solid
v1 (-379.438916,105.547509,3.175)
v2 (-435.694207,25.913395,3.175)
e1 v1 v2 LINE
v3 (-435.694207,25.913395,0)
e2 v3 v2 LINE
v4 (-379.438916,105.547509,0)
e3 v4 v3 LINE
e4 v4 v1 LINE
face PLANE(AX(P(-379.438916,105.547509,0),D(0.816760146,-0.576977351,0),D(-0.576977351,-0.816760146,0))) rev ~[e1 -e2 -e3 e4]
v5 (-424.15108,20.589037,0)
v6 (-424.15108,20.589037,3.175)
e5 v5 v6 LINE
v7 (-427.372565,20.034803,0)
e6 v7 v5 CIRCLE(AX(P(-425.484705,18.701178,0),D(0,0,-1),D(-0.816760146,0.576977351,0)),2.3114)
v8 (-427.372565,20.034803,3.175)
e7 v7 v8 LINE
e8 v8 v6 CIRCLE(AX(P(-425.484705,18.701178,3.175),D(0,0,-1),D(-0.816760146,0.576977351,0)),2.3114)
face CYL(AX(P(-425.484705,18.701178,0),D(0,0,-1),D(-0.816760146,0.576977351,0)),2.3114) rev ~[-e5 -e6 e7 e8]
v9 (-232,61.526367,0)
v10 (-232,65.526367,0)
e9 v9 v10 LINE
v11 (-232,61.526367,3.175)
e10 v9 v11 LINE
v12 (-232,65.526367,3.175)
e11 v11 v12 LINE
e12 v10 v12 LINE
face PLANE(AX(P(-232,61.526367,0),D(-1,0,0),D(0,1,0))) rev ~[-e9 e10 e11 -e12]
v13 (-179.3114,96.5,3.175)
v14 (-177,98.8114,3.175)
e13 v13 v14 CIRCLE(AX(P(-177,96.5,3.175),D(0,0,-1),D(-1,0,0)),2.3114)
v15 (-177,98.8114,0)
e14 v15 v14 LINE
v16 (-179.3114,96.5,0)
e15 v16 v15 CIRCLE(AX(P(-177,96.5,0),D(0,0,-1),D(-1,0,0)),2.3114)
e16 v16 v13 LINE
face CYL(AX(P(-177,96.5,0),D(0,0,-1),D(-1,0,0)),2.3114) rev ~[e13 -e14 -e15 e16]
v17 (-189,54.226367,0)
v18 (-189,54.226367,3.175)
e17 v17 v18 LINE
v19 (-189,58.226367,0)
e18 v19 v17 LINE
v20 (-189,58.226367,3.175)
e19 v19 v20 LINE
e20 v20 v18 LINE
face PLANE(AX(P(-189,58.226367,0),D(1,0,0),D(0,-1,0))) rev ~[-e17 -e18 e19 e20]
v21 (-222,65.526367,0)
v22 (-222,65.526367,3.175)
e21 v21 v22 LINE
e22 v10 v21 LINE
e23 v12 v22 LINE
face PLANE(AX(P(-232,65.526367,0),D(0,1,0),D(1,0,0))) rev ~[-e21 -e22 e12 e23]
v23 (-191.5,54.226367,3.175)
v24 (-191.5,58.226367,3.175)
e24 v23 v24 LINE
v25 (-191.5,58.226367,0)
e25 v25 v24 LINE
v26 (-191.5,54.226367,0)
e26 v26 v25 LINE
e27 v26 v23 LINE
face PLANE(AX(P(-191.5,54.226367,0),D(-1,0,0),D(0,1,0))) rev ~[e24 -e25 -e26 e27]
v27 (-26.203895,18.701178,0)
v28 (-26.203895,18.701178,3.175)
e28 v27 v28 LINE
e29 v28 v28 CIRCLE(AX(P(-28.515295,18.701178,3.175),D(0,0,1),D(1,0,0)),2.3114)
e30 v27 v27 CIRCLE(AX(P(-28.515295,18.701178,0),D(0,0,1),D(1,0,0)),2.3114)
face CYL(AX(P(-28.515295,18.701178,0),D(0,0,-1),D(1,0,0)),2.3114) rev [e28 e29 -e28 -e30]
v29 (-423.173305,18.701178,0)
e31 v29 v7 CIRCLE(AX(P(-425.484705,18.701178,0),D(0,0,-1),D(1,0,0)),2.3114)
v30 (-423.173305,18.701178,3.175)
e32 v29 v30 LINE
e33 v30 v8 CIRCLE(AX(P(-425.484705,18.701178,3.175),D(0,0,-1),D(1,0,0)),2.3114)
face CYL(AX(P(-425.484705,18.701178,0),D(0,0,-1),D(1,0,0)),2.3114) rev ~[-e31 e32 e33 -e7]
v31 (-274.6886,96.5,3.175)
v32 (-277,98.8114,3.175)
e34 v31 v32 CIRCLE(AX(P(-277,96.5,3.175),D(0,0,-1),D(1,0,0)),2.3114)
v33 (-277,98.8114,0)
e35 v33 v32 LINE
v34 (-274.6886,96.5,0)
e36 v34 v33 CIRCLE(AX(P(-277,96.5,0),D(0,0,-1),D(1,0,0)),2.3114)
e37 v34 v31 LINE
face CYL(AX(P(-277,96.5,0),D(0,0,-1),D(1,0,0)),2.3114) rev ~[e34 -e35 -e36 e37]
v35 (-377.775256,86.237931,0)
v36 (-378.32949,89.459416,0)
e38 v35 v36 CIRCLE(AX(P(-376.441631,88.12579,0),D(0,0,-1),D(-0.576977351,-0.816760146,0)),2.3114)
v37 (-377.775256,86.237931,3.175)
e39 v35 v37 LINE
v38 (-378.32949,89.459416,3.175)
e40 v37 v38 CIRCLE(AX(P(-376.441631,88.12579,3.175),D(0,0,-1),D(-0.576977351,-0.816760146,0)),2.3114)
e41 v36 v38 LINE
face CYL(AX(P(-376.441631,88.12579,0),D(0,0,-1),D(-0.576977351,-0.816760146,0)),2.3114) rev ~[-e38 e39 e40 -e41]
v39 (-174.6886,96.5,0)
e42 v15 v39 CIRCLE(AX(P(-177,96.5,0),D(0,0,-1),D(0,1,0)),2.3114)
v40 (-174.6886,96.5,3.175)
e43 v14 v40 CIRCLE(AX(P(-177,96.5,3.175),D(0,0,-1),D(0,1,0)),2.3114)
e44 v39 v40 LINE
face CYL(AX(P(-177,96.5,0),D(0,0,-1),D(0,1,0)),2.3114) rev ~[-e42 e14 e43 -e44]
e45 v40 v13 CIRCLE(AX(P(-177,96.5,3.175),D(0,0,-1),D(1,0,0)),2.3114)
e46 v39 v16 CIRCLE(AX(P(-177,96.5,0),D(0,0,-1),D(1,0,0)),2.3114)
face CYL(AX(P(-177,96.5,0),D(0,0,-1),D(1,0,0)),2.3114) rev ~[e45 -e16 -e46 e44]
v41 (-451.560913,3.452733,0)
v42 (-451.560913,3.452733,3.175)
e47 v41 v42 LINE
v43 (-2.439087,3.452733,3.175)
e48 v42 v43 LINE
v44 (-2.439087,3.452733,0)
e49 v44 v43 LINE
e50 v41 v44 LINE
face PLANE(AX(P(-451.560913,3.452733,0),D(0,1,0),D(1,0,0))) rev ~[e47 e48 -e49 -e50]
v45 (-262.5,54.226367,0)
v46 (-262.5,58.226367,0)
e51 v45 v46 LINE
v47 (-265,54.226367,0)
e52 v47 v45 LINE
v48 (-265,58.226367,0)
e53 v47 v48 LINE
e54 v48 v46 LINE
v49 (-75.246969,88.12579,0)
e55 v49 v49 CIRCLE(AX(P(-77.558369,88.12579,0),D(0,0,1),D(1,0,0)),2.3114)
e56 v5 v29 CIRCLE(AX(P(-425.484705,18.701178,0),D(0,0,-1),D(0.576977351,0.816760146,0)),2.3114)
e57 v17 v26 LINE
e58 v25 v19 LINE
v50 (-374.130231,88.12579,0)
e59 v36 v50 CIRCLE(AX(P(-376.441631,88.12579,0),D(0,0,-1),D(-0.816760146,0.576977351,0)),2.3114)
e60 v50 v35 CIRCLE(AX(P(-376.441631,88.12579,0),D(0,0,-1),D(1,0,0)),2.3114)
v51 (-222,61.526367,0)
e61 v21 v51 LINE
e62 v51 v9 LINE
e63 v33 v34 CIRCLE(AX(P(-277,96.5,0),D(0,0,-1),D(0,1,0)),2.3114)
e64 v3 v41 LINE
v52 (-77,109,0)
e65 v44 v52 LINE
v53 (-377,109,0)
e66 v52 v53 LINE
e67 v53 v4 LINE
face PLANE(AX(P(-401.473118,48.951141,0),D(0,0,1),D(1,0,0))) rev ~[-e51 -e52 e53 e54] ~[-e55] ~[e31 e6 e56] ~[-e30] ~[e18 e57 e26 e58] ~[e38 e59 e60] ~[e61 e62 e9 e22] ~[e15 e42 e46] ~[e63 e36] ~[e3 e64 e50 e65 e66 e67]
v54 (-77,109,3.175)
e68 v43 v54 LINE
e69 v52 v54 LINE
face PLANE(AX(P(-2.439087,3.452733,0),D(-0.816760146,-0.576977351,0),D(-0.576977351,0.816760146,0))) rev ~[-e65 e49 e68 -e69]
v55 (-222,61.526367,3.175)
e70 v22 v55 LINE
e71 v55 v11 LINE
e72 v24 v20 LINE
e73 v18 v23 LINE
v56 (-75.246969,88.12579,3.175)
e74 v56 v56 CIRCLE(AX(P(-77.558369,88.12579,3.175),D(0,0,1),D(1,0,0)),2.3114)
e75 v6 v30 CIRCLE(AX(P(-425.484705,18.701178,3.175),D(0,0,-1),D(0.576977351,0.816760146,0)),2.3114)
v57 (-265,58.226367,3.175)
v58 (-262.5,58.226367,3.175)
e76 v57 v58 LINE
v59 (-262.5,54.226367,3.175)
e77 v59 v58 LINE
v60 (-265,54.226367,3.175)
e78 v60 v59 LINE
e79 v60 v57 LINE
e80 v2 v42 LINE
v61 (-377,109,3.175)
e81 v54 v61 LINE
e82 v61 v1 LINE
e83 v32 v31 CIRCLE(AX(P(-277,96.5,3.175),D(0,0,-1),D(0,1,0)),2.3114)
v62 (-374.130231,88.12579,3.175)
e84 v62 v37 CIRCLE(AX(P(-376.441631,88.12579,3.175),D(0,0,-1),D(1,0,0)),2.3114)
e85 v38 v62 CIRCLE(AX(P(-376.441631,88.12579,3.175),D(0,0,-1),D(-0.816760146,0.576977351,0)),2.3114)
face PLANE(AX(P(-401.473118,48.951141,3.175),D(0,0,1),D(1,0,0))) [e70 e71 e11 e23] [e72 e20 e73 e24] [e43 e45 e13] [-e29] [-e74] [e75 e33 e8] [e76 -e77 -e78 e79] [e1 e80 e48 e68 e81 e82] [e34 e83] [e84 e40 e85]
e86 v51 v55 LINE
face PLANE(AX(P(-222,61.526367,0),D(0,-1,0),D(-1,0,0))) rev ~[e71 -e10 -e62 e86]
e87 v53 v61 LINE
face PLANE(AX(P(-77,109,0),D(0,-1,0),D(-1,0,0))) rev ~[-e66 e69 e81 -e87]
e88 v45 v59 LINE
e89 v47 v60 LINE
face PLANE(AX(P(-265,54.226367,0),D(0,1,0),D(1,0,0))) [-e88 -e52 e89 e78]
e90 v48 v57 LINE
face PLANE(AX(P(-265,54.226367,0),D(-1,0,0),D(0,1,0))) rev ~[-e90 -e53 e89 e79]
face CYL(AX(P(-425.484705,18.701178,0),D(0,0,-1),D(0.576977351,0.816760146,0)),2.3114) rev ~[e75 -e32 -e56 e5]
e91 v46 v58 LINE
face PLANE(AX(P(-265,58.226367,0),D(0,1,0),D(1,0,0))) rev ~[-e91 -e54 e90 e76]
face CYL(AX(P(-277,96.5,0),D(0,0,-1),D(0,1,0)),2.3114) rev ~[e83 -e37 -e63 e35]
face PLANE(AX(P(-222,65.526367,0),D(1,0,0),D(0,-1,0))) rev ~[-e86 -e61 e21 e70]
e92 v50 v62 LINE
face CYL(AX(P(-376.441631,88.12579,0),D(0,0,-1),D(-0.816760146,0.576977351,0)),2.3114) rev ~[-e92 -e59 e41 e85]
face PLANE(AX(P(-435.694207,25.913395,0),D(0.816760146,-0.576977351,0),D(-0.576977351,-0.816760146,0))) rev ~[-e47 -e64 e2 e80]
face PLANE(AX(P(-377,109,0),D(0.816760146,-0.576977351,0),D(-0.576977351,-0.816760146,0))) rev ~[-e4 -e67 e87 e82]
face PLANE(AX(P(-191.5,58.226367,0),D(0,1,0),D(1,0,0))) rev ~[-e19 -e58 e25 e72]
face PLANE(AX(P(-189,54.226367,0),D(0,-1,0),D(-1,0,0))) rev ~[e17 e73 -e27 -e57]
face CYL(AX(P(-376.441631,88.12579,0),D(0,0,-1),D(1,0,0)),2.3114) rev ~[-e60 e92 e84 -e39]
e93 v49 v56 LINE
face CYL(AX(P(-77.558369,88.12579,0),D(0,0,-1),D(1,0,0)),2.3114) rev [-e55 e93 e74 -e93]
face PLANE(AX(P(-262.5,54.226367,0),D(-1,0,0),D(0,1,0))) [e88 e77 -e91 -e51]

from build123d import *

# Parameters (mm, degrees)
F0_W     = 2.5
F0_H     = 4
F0_R     = 2.3114
F1_DEPTH = 3.175


with BuildPart() as f1:
    # F0 (on Top) → F1 (new body)
    with BuildSketch(Plane.XY):
        with BuildLine():
            Line((-451.5609132883, 3.4527331373), (-420.9521720122, 3.4527331373))
            Line((-420.9521720122, 3.4527331373), (-359.0199119076, 91.1230753634))
            Line((-359.0199119076, 91.1230753634), (-379.4389155629, 105.5475091382))
            Line((-379.4389155629, 105.5475091382), (-386.6511324503, 95.3380073106))
            Line((-386.6511324503, 95.3380073106), (-378.3294900246, 89.4594158723))
            ThreePointArc((-378.3294900246, 89.4594158723), (-375.7419979554, 90.3287620732), (-374.1302306227, 88.1257904232))
            ThreePointArc((-374.1302306227, 88.1257904232), (-375.3786094336, 86.0733392273), (-377.7752560717, 86.2379310212))
            Line((-377.7752560717, 86.2379310212), (-424.151080008, 20.5890373971))
            ThreePointArc((-424.151080008, 20.5890373971), (-423.4322542612, 19.7641991843), (-423.1733054571, 18.7011779952))
            ThreePointArc((-423.1733054571, 18.7011779952), (-426.1843381244, 16.4982063451), (-427.3725648591, 20.0348034442))
            Line((-427.3725648591, 20.0348034442), (-435.6942072848, 25.9133948826))
            Line((-435.6942072848, 25.9133948826), (-451.5609132883, 3.4527331373))
        make_face()
        Polygon((-359.0199119076, 91.1230753634), (-420.9521720122, 3.4527331373), (-227, 3.4527331373), (-227, 56.2263665687), (-227, 61.5263665687), (-232, 61.5263665687), (-232, 65.5263665687), (-227, 65.5263665687), (-227, 77.2140920162), (-227, 109), (-277, 109), (-377, 109), (-379.4389155629, 105.5475091382), align=None)
        with Locations((-263.75, 56.2263665687)):
            Rectangle(F0_W, F0_H, mode=Mode.SUBTRACT)
        with BuildLine():
            ThreePointArc((-274.6886, 96.5), (-278.634406614, 94.865593386), (-277, 98.8114))
            ThreePointArc((-277, 98.8114), (-275.365593386, 98.134406614), (-274.6886, 96.5))
        make_face(mode=Mode.SUBTRACT)
        Polygon((-227, 56.2263665687), (-227, 3.4527331373), (-2.4390867117, 3.4527331373), (-77, 109), (-177, 109), (-227, 109), (-227, 77.2140920162), (-227, 65.5263665687), (-222, 65.5263665687), (-222, 61.5263665687), (-227, 61.5263665687), align=None)
        with Locations((-28.5152945429, 18.7011779952)):
            Circle(F0_R, mode=Mode.SUBTRACT)
        Polygon((-191.5, 54.2263665687), (-191.5, 56.2263665687), (-191.5, 58.2263665687), (-189, 58.2263665687), (-189, 54.2263665687), align=None, mode=Mode.SUBTRACT)
        with Locations((-77.5583693773, 88.1257904232)):
            Circle(F0_R, mode=Mode.SUBTRACT)
        with BuildLine():
            ThreePointArc((-174.6886, 96.5), (-177, 94.1886), (-179.3114, 96.5))
            ThreePointArc((-179.3114, 96.5), (-178.634406614, 98.134406614), (-177, 98.8114))
            ThreePointArc((-177, 98.8114), (-175.365593386, 98.134406614), (-174.6886, 96.5))
        make_face(mode=Mode.SUBTRACT)
        with BuildLine():
            Line((-415.5, 54.5), (-435.6942072848, 25.9133948826))
            Line((-435.6942072848, 25.9133948826), (-427.3725648591, 20.0348034442))
            ThreePointArc((-427.3725648591, 20.0348034442), (-425.8766080436, 20.9791117788), (-424.151080008, 20.5890373971))
            Line((-424.151080008, 20.5890373971), (-377.7752560717, 86.2379310212))
            ThreePointArc((-377.7752560717, 86.2379310212), (-378.7195644063, 87.7338878367), (-378.3294900246, 89.4594158723))
            Line((-378.3294900246, 89.4594158723), (-386.6511324503, 95.3380073106))
            Line((-386.6511324503, 95.3380073106), (-415.5, 54.5))
        make_face()
    extrude(amount=F1_DEPTH)


solid = f1.part
